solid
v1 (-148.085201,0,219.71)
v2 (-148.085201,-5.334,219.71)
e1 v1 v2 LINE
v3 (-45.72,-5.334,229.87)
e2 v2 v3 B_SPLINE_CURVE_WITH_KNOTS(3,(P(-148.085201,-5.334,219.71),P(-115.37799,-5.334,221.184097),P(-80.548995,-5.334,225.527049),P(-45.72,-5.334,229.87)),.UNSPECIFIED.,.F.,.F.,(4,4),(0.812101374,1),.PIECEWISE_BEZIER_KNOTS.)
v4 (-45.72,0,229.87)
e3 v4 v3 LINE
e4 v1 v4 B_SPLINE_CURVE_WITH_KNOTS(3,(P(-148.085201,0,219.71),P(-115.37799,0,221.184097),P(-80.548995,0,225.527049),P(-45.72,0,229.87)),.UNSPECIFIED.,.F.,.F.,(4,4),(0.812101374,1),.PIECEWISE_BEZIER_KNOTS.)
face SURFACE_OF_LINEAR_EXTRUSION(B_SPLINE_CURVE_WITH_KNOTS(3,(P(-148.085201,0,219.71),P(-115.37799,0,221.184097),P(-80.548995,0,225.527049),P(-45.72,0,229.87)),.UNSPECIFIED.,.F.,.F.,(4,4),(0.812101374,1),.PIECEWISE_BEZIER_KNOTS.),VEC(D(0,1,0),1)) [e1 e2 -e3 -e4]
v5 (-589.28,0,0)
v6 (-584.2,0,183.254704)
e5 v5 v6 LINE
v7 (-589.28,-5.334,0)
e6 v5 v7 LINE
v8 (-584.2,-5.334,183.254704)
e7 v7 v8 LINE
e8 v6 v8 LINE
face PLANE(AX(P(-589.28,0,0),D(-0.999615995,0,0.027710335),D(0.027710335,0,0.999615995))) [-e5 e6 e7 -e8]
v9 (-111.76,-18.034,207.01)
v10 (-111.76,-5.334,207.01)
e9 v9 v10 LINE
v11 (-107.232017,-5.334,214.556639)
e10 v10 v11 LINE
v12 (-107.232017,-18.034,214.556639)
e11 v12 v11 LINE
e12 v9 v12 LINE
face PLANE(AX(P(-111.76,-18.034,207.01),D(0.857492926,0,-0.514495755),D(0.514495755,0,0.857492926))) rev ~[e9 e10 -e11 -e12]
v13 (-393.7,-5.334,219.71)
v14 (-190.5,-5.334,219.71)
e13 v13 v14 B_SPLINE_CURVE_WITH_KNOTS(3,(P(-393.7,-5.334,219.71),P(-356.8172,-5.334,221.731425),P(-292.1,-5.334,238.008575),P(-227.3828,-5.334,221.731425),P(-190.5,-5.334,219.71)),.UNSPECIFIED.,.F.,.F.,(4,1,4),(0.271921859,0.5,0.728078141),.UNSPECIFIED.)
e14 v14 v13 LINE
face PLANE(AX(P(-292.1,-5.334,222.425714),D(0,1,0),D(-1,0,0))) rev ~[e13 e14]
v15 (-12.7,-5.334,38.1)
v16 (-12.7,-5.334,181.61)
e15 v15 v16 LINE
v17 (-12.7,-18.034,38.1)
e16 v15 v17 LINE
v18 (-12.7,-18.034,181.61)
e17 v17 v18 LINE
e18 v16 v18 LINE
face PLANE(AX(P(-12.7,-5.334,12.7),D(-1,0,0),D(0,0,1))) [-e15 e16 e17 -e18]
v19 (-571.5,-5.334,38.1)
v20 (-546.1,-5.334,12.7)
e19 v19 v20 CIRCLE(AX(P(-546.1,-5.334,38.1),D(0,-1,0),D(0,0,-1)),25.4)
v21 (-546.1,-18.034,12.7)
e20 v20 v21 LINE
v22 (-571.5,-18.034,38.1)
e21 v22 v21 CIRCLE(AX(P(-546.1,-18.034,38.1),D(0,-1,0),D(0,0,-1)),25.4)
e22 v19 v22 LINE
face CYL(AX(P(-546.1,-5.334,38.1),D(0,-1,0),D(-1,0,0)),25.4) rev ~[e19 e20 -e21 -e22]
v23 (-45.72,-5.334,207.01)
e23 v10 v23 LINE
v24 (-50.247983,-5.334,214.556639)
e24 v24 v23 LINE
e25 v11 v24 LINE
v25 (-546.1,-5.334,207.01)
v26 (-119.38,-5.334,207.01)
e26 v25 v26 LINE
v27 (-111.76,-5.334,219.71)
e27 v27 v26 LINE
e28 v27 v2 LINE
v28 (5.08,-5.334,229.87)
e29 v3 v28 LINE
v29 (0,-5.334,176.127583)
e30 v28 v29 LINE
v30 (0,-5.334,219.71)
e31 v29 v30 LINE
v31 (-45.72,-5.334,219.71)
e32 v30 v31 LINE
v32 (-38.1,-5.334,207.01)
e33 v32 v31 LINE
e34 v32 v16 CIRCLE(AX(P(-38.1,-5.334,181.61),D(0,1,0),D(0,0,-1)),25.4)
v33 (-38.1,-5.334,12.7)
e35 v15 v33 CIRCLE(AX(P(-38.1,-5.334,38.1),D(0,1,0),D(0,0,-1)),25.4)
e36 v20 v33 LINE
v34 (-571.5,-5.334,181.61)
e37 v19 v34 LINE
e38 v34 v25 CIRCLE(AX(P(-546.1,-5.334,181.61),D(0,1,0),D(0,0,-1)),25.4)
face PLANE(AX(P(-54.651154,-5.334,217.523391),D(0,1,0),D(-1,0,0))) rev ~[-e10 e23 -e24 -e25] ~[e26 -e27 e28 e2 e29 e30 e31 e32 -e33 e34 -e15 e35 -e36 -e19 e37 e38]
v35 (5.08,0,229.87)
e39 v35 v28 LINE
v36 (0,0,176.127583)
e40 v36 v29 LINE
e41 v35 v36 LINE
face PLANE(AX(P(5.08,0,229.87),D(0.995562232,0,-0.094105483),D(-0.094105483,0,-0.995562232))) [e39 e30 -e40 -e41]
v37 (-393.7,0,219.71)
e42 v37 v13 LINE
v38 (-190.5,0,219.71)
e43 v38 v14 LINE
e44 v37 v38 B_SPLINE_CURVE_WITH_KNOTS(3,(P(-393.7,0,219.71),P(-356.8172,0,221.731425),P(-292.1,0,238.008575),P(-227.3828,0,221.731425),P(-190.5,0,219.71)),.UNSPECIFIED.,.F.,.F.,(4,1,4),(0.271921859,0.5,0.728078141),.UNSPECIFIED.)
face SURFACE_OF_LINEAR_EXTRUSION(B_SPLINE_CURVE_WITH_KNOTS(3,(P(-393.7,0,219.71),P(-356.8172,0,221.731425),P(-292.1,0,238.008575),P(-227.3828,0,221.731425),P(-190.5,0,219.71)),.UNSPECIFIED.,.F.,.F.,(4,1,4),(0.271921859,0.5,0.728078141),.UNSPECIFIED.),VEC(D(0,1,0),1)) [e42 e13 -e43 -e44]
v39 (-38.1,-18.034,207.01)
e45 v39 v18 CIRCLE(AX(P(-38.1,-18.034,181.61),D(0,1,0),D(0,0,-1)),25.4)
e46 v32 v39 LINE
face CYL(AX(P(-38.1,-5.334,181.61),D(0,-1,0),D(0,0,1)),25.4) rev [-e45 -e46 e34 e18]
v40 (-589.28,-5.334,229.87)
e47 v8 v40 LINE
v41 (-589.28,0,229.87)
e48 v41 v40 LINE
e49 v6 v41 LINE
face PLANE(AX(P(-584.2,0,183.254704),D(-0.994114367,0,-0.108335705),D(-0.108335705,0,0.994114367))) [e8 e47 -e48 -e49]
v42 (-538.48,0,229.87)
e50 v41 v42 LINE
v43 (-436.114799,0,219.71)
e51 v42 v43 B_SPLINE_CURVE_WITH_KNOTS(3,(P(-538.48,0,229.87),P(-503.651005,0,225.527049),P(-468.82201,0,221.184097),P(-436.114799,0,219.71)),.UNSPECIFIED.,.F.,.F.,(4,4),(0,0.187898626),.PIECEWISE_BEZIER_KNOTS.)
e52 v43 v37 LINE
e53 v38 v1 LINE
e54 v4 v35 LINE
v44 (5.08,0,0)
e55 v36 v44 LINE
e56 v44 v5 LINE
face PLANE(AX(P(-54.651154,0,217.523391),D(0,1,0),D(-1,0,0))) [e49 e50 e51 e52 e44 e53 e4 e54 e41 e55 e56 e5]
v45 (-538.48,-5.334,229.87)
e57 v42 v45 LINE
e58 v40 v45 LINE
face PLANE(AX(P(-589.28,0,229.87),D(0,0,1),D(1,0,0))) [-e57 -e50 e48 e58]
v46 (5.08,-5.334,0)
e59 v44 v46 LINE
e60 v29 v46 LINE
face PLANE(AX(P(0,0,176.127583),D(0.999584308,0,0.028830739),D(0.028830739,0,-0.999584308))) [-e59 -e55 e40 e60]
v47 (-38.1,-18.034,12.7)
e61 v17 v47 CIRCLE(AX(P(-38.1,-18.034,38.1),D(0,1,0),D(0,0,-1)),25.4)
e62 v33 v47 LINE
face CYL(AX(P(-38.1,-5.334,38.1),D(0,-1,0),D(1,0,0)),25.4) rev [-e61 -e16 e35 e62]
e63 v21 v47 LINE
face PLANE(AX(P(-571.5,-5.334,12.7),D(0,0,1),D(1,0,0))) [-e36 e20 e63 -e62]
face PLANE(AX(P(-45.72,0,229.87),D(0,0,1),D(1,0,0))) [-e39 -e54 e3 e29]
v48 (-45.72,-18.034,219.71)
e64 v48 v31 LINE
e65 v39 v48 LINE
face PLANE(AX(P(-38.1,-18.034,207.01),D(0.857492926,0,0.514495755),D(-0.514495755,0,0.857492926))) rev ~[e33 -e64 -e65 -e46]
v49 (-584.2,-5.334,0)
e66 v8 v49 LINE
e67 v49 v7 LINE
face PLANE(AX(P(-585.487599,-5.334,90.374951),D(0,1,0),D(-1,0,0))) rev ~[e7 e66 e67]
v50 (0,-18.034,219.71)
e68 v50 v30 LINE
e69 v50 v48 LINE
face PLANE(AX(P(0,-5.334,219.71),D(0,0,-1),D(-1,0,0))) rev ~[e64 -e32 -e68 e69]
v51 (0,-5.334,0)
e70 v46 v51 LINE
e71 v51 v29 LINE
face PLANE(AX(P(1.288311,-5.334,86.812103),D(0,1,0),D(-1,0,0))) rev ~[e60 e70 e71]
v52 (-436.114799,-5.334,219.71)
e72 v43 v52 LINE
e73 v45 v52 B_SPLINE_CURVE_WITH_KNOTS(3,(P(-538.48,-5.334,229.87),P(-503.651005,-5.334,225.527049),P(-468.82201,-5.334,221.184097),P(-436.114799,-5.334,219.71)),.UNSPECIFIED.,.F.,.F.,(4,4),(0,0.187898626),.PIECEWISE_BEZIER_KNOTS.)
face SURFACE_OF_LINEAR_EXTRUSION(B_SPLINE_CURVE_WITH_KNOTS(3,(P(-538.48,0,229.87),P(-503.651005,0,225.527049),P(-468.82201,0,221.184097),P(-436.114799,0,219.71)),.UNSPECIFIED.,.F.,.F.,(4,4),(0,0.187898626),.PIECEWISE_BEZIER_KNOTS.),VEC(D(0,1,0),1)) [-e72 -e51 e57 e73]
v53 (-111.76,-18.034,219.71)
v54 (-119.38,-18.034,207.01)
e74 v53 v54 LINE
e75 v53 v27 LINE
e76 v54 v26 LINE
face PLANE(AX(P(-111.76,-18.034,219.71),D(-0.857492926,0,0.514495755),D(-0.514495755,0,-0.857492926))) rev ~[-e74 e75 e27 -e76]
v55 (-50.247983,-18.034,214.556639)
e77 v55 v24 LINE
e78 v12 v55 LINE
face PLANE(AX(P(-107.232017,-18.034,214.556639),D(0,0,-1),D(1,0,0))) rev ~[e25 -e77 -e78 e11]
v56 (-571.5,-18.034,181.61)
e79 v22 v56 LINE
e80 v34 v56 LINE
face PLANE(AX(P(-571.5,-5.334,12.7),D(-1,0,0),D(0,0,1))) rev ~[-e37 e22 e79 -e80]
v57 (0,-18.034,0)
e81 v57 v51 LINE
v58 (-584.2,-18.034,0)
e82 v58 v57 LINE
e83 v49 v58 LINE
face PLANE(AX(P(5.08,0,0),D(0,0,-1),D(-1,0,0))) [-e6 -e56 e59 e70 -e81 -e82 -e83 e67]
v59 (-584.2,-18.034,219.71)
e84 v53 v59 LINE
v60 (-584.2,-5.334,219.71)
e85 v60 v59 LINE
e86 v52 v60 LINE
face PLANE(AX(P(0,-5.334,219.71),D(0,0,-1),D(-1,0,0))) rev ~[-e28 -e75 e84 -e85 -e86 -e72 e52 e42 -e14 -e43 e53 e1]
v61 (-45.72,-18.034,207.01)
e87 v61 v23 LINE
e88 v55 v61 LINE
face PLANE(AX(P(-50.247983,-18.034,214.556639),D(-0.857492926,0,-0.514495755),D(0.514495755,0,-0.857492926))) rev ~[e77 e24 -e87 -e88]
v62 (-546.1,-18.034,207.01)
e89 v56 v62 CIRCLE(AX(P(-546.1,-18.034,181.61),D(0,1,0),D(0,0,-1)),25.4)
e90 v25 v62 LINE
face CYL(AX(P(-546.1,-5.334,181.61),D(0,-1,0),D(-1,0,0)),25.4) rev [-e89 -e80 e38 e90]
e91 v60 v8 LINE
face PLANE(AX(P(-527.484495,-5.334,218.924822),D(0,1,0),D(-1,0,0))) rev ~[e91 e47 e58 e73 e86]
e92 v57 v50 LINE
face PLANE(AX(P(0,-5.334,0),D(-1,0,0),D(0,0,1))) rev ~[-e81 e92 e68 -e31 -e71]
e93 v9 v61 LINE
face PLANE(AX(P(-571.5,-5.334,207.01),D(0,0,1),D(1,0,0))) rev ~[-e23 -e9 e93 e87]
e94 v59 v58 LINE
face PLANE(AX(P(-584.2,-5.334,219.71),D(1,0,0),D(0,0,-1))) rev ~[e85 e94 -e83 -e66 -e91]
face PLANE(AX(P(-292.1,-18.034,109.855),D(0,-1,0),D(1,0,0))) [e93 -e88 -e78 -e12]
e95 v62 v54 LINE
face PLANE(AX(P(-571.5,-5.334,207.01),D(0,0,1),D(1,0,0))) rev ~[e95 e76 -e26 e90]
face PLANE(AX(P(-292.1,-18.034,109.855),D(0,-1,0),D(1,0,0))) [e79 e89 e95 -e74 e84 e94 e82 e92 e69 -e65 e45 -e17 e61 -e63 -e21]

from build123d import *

# Parameters (mm, degrees)
F0_W     = 584.2
F0_H     = 219.71
F1_DEPTH = 5.334
F2_W     = 558.8
F2_H     = 194.31
F3_DEPTH = 12.7
F4_R     = 25.4
F6_DEPTH = 12.7
F8_DEPTH = 5.334


# Not quite as in the source:
# - a feature names something its author has since deleted; it is built from what else it names


with BuildPart() as f1:
    # F0 (on Front) → F1 (new body)
    with BuildSketch(Plane.XZ):
        with Locations((-292.1, 109.855)):
            Rectangle(F0_W, F0_H)
    extrude(amount=F1_DEPTH)

    # F2 (on face) → F3 (join)
    with BuildSketch(Plane.XZ.offset(5.334)):
        Polygon((0, 219.71), (-6.35, 219.71), (-577.85, 219.71), (-584.2, 219.71), (-584.2, 0), (0, 0), align=None)
        with Locations((-292.1, 109.855)):
            Rectangle(F2_W, F2_H, mode=Mode.SUBTRACT)
    extrude(amount=F3_DEPTH)

    # F4
    f4_edges = [f1.edges().sort_by_distance(p)[0] for p in [
        (-571.5, -11.684, 207.01),
        (-12.7, -11.684, 207.01),
        (-12.7, -11.684, 12.7),
        (-571.5, -11.684, 12.7),
    ]]
    fillet(f4_edges, radius=F4_R)

    # F5 (on face) → F6 (cut)
    with BuildSketch(Plane.XZ.offset(18.034)):
        Polygon((-104.14, 219.71), (-111.76, 219.71), (-119.38, 207.01), (-111.76, 207.01), (-107.2320166854, 214.5566388576), align=None)
        Polygon((-38.1, 207.01), (-45.72, 219.71), (-53.34, 219.71), (-50.2479833146, 214.5566388576), (-45.72, 207.01), align=None)
        Polygon((-53.34, 219.71), (-104.14, 219.71), (-107.2320166854, 214.5566388576), (-50.2479833146, 214.5566388576), align=None)
    extrude(amount=-F6_DEPTH, mode=Mode.SUBTRACT)

    # F7 (on face) → F8 (join)
    with BuildSketch(Plane(origin=(0, 0, 0), x_dir=(-1, 0, 0), z_dir=(0, 1, 0))):
        with BuildLine():
            Line((-5.08, 229.87), (0, 176.1275827885))
            Line((0, 176.1275827885), (0, 219.71))
            Line((0, 219.71), (148.0852009026, 219.71))
            add(Edge.make_bspline(
                [(148.0852009026, 219.71), (115.3779899576, 221.1840971885), (80.5489949788, 225.5270485943), (45.72, 229.87)],
                knots=[0.812101374, 0.812101374, 0.812101374, 0.812101374, 1, 1, 1, 1], degree=3))
            Line((45.72, 229.87), (-5.08, 229.87))
        make_face()
        with BuildLine():
            add(Edge.make_bspline(
                [(393.7, 219.71), (356.8171998762, 221.731425099), (324.4585999381, 229.87), (292.1, 229.87)],
                knots=[0.2719218593, 0.2719218593, 0.2719218593, 0.2719218593, 0.5, 0.5, 0.5, 0.5], degree=3))
            add(Edge.make_bspline(
                [(292.1, 229.87), (259.7414000619, 229.87), (227.3828001238, 221.731425099), (190.5, 219.71)],
                knots=[0.5, 0.5, 0.5, 0.5, 0.7280781407, 0.7280781407, 0.7280781407, 0.7280781407], degree=3))
            Line((190.5, 219.71), (393.7, 219.71))
        make_face()
        Polygon((584.2, 183.2547038794), (584.2, 0), (589.28, 0), align=None)
        with BuildLine():
            Line((584.2, 219.71), (584.2, 183.2547038794))
            Line((584.2, 183.2547038794), (589.28, 229.87))
            Line((589.28, 229.87), (538.48, 229.87))
            add(Edge.make_bspline(
                [(538.48, 229.87), (503.6510050212, 225.5270485943), (468.8220100424, 221.1840971885), (436.1147990974, 219.71)],
                knots=[0, 0, 0, 0, 0.187898626, 0.187898626, 0.187898626, 0.187898626], degree=3))
            Line((436.1147990974, 219.71), (584.2, 219.71))
        make_face()
        Polygon((-5.08, 0), (0, 0), (0, 176.1275827885), align=None)
    extrude(amount=-F8_DEPTH)


solid = f1.part
